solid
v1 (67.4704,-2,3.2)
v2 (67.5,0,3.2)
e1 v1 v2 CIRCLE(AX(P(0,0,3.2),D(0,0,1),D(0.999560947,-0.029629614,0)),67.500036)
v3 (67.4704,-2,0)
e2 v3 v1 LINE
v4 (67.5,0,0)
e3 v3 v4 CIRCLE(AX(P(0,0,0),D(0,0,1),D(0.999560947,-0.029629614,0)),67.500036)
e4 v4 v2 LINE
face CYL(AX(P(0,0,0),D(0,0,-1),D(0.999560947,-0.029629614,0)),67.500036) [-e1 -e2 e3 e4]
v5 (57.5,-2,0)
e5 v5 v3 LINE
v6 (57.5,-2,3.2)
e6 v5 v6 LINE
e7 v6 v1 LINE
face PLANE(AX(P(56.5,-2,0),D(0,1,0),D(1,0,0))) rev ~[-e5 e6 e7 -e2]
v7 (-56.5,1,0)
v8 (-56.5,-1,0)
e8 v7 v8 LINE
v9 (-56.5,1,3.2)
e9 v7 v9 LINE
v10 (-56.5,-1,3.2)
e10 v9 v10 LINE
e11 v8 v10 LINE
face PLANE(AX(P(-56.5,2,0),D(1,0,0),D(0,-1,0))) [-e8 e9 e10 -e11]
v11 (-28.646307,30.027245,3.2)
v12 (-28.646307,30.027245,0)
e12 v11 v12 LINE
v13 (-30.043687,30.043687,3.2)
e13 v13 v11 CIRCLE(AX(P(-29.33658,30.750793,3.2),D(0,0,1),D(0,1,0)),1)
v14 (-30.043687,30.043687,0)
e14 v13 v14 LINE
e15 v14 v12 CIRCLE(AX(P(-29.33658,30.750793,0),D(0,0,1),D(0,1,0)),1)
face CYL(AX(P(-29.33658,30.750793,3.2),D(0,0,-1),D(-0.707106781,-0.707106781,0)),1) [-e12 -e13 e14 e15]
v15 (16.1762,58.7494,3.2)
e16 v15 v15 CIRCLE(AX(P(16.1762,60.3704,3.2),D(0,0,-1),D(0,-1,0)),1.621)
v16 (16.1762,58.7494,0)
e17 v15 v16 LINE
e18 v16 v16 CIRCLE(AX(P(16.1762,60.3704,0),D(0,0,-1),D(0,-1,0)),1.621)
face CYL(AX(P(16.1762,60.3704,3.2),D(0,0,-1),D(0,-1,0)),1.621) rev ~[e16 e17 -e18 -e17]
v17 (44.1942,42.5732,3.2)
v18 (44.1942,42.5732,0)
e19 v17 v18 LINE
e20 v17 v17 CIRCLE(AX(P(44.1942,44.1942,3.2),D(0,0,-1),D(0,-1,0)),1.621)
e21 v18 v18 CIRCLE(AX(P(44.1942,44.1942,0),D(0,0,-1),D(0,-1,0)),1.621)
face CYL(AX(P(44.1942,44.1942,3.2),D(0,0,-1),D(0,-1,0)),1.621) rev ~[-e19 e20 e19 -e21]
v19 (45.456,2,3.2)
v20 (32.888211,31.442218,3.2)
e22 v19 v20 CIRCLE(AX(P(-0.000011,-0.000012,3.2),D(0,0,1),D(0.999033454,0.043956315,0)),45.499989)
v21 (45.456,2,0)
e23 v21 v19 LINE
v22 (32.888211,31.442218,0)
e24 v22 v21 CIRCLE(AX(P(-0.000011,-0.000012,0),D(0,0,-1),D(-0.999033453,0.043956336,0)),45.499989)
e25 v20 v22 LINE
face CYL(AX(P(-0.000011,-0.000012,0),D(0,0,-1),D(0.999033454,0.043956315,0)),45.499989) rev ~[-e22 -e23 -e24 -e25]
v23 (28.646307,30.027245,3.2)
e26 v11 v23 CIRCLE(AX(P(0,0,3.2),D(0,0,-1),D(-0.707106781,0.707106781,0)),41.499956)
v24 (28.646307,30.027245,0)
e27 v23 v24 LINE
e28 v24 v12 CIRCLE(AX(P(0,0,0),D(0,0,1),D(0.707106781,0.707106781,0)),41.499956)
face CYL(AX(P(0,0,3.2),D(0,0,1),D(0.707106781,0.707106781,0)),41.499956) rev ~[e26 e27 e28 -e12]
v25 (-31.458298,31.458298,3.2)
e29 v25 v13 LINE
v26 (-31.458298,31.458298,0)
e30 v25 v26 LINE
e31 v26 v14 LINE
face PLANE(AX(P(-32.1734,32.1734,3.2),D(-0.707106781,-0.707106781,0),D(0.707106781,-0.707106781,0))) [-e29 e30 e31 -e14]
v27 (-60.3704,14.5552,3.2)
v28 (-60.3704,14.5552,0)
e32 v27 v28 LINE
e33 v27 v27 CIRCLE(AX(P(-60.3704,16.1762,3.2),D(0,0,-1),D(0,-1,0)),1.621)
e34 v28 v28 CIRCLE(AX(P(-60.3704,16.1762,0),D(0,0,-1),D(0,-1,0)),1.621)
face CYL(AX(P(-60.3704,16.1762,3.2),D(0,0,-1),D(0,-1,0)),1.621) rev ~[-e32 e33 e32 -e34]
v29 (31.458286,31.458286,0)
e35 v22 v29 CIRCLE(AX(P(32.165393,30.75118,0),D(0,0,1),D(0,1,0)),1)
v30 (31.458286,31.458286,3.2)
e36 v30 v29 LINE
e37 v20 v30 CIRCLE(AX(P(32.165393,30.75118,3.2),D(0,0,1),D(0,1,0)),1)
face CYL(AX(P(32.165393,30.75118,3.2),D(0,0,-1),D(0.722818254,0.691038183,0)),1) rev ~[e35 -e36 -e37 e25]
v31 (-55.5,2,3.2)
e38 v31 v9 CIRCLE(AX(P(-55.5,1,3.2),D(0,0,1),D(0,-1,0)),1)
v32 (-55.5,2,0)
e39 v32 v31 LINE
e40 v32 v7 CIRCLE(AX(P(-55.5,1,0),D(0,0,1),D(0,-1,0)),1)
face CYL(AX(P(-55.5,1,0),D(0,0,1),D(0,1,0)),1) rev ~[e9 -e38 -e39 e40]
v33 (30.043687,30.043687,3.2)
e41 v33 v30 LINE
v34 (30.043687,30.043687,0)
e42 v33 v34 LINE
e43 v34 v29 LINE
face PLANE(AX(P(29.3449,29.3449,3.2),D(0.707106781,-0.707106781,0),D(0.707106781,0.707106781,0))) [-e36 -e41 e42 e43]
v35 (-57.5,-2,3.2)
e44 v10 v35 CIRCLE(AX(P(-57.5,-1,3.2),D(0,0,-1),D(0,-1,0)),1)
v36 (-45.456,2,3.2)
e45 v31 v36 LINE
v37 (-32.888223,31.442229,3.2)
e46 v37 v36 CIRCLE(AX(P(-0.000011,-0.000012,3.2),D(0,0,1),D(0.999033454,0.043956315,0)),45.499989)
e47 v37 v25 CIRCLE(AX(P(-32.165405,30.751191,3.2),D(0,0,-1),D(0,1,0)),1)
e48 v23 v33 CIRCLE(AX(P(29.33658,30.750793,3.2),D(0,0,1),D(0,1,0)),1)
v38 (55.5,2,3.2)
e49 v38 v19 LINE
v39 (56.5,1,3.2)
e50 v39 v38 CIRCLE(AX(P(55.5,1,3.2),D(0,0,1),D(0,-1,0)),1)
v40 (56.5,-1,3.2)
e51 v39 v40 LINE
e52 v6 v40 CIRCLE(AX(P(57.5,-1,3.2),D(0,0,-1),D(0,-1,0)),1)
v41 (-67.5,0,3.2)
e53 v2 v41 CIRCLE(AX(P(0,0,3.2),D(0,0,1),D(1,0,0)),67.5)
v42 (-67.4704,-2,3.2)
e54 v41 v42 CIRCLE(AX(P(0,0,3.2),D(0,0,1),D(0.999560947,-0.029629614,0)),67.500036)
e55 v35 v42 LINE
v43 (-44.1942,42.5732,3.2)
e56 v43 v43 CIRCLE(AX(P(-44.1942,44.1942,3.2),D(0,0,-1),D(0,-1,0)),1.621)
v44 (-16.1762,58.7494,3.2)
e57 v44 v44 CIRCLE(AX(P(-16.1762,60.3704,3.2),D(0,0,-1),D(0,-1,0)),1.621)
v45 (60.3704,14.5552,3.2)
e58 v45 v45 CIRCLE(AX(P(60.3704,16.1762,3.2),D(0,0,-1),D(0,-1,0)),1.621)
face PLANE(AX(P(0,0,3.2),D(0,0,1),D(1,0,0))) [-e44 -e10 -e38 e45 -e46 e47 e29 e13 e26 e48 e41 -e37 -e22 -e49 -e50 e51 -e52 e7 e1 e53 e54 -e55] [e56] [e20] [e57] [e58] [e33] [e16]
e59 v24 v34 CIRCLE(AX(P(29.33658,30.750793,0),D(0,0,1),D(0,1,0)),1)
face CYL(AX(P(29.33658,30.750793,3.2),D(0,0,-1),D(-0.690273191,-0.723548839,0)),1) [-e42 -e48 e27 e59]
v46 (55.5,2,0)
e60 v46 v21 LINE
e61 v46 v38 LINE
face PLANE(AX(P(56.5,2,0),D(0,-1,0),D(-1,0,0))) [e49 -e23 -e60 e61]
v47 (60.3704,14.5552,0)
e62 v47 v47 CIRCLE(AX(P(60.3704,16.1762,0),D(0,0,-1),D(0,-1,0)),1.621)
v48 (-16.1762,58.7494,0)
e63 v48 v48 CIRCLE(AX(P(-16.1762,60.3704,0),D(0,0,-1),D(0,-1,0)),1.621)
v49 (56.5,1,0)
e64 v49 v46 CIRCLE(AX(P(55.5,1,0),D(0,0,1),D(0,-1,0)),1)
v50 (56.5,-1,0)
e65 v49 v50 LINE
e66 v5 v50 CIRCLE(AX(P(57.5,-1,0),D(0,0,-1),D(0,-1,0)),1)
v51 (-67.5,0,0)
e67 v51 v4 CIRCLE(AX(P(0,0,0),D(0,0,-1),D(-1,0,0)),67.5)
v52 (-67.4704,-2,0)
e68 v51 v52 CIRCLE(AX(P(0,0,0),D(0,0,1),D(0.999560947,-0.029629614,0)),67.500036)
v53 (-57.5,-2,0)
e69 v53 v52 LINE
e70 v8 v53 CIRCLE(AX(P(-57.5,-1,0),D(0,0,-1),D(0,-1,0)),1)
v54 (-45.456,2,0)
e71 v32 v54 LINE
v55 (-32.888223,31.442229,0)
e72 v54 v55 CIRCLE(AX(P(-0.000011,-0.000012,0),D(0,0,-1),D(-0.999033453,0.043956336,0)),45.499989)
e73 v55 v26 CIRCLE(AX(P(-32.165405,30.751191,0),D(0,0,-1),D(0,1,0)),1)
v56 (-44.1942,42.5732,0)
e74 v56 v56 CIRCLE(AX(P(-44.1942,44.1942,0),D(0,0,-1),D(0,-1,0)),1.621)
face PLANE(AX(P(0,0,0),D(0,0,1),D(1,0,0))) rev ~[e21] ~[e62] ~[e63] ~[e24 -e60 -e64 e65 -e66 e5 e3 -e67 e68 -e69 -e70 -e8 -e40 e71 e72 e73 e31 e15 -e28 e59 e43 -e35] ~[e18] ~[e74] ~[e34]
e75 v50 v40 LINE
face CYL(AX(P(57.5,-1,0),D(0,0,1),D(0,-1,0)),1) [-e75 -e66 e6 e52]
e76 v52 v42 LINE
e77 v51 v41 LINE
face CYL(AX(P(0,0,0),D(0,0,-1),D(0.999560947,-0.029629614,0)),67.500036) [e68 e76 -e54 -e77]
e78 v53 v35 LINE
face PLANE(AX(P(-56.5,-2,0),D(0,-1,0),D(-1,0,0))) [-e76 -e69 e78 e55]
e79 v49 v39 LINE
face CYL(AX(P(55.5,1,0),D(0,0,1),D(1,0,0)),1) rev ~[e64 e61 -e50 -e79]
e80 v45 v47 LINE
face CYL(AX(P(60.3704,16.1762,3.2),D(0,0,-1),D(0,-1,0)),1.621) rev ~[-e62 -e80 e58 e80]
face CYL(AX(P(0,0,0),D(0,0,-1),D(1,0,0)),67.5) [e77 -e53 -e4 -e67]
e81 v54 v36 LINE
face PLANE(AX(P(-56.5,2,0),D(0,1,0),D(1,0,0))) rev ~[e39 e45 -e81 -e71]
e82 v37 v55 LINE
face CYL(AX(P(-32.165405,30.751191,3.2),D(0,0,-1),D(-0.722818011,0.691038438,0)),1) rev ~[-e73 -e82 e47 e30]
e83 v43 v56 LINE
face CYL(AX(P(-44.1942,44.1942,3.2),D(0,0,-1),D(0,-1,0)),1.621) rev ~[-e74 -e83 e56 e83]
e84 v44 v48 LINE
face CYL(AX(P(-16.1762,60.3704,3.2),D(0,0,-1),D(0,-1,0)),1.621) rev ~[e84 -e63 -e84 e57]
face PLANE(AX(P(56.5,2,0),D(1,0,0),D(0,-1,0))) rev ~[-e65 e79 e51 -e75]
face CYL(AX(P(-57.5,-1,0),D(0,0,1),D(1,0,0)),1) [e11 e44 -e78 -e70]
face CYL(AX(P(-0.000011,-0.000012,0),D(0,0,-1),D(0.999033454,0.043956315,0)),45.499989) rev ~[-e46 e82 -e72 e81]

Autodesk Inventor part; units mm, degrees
ref_plane "YZ Plane" through (0, 0, 0) normal (1, 0, 0) x (0, 1, 0)
ref_plane "XZ Plane" through (0, 0, 0) normal (0, 1, 0) x (-1, 0, 0)
ref_plane "XY Plane" through (0, 0, 0) normal (0, 0, 1) x (1, 0, 0)
sketch "スケッチ5" plane through (0, 0, 3.2) normal (0, 0, 1) x (1, 0, 0)
  circle A0 centre (-16.1762, 60.3704) radius 1.621 projected
  circle A1 centre (16.1762, 60.3704) radius 1.621 projected
  arc A2 (67.5, 0) -> (-67.5, 0) centre (0, 0) ccw projected
  circle A3 centre (-16.1762, 60.3704) radius 5
  circle A4 centre (16.1762, 60.3704) radius 5
  circle A5 centre (-44.1942, 44.1942) radius 1.621 projected
  circle A6 centre (-60.3704, 16.1762) radius 1.621 projected
  circle A7 centre (44.1942, 44.1942) radius 1.621 projected
  circle A8 centre (60.3704, 16.1762) radius 1.621 projected
  arc A9 (62.5, 0) -> (-62.5, 0) centre (0, 0) ccw
  circle A10 centre (-44.1942, 44.1942) radius 5
  circle A11 centre (-60.3704, 16.1762) radius 5
  circle A12 centre (44.1942, 44.1942) radius 5
  circle A13 centre (60.3704, 16.1762) radius 5
  line L0 (-45.5, 0) -> (-67.5, 0) projected
  line L1 (67.5, 0) -> (45.5, 0) projected
  point P0 (17.4703, 65.2)
  point P1 (-17.4703, 65.2)
  point P2 (58.8841, 20.9502)
  point P3 (65.2, 17.4703)
  point P4 (47.7297, 47.7297)
  point P5 (47.5855, 40.52)
  point P6 (40.52, 47.5855)
  point P7 (20.9502, 58.8841)
  point P8 (-65.2, 17.4703)
  point P9 (-58.8841, 20.9502)
  point P10 (-47.5855, 40.52)
  point P11 (-47.7297, 47.7297)
  point P12 (-40.52, 47.5855)
  point P13 (-20.9502, 58.8841)
  point P14 (-11.2987, 61.4702)
  point P15 (11.2987, 61.4702)
  point P16 (61.4702, 11.2987)
  point P17 (-61.4702, 11.2987)
sketch "スケッチ1" plane through (0, 0, 0) normal (0, 0, 1) x (1, 0, 0)
  arc A0 (45.456, 2) -> (-45.5, 0) centre (0, 0) ccw
  arc A1 (67.5, 0) -> (-67.5, 0) centre (0, 0) ccw
  arc A2 (67.4704, -2) -> (-67.4704, -2) centre (0, 0) ccw
  arc A3 (45.456, 2) -> (-45.456, 2) centre (0, 0) ccw
  line L0 (-56.5, 2) -> (-56.5, -2)
  line L1 (-56.5, 2) -> (-45.456, 2)
  line L2 (-56.5, -2) -> (-67.4704, -2)
  line L3 (0, 81.4) -> (0, -15.9)
  line L4 (56.5, 2) -> (56.5, -2)
  line L5 (56.5, 2) -> (45.456, 2)
  line L6 (56.5, -2) -> (67.4704, -2)
  line L7 (-45.5, 0) -> (0, 0)
  point P0 (44.5, 0)
  point P1 (45.5, 0)
  dimension "d0" = 91
  dimension "d1" = 135
  dimension "d58" = 11
  dimension "d61" = 2
  dimension "d62" = 2
extrude "プレート2" add sketch "スケッチ1" along normal blind 3.2 contours L1 L0 L2 A2 A1 L3 A0 | L3 A1 A2 L6 L4 L5 A0
sketch "スケッチ2" plane through (0, 0, 3.2) normal (0, 0, 1) x (1, 0, 0)
  circle A0 centre (0, 0) radius 62.5
  point P0 (16.1762, 60.3704)
  point P1 (-16.1762, 60.3704)
  point P2 (-44.1942, 44.1942)
  point P3 (-60.3704, 16.1762)
  point P4 (-60.3704, -16.1762)
  point P5 (-44.1942, -44.1942)
  point P6 (-16.1762, -60.3704)
  point P7 (16.1762, -60.3704)
  point P8 (44.1942, -44.1942)
  point P9 (60.3704, -16.1762)
  point P10 (60.3704, 16.1762)
  point P11 (44.1942, 44.1942)
  dimension "d8" = 125
  dimension "d11" = 360
  dimension "d49" = 0
hole "穴1" at (16.1762, 60.3704, 3.2) at (-16.1762, 60.3704, 3.2) at (-44.1942, 44.1942, 3.2) at (-60.3704, 16.1762, 3.2) at (-60.3704, -16.1762, 3.2) at (-44.1942, -44.1942, 3.2) at (-16.1762, -60.3704, 3.2) at (16.1762, -60.3704, 3.2) at (44.1942, -44.1942, 3.2) at (60.3704, -16.1762, 3.2) at (60.3704, 16.1762, 3.2) at (44.1942, 44.1942, 3.2) direction (0, 0, -1) diameter 3.242 end through all thread size "M4x0.7" class "6H" standard "ANSI Metric M Profile"
sketch "スケッチ6" plane through (0, 0, 3.2) normal (0, 0, 1) x (1, 0, 0)
  line L0 (-32.1734, 32.1734) -> (-29.3449, 29.3449)
  line L1 (29.3449, 29.3449) -> (32.1734, 32.1734)
  line L2 (0, 81.4) -> (0, -15.9) projected
  arc A0 (29.3449, 29.3449) -> (-29.3449, 29.3449) centre (0, 0) ccw
  arc A1 (45.456, 2) -> (-45.456, 2) centre (0, 0) ccw projected
  line L3 (-29.3449, 29.3449) -> (0, 0) construction
  line L4 (0, 0) -> (29.3449, 29.3449) construction
  point P0 (29.3449, 29.3449)
  dimension "d50" = 45
  dimension "d51" = 45
  dimension "d64" = 4
extrude "押し出し2" add sketch "スケッチ6" against normal up to surface (3.2 mm away)
fillet "コーナーR7" radius 1 4 edges at (-32.1734, 32.1734, 1.6) (-29.3449, 29.3449, 1.6) (32.1734, 32.1734, 1.6) (29.3449, 29.3449, 1.6)
fillet "コーナーR8" radius 1 4 edges at (-56.5, 2, 1.6) (56.5, 2, 1.6) (-56.5, -2, 1.6) (56.5, -2, 1.6)
equation "\"d18\" = Thickness"
equation "\"d6\" = Thickness"
equation "\"BendRadius\" = Thickness"
equation "\"BendReliefWidth\" = Thickness"
equation "\"BendReliefDepth\" = 0.5 * Thickness"
equation "\"CornerReliefSize\" = 4 * Thickness"
equation "\"MinimumRemnant\" = 2 * Thickness"
equation "\"TransitionRadius\" = BendRadius"
equation "\"JacobiRadiusSize\" = BendRadius"
equation "\"GapSize\" = Thickness"
equation "\"Thickness\" = 3.2"
properties part number "plate1" material "鋼、炭素鋼"
